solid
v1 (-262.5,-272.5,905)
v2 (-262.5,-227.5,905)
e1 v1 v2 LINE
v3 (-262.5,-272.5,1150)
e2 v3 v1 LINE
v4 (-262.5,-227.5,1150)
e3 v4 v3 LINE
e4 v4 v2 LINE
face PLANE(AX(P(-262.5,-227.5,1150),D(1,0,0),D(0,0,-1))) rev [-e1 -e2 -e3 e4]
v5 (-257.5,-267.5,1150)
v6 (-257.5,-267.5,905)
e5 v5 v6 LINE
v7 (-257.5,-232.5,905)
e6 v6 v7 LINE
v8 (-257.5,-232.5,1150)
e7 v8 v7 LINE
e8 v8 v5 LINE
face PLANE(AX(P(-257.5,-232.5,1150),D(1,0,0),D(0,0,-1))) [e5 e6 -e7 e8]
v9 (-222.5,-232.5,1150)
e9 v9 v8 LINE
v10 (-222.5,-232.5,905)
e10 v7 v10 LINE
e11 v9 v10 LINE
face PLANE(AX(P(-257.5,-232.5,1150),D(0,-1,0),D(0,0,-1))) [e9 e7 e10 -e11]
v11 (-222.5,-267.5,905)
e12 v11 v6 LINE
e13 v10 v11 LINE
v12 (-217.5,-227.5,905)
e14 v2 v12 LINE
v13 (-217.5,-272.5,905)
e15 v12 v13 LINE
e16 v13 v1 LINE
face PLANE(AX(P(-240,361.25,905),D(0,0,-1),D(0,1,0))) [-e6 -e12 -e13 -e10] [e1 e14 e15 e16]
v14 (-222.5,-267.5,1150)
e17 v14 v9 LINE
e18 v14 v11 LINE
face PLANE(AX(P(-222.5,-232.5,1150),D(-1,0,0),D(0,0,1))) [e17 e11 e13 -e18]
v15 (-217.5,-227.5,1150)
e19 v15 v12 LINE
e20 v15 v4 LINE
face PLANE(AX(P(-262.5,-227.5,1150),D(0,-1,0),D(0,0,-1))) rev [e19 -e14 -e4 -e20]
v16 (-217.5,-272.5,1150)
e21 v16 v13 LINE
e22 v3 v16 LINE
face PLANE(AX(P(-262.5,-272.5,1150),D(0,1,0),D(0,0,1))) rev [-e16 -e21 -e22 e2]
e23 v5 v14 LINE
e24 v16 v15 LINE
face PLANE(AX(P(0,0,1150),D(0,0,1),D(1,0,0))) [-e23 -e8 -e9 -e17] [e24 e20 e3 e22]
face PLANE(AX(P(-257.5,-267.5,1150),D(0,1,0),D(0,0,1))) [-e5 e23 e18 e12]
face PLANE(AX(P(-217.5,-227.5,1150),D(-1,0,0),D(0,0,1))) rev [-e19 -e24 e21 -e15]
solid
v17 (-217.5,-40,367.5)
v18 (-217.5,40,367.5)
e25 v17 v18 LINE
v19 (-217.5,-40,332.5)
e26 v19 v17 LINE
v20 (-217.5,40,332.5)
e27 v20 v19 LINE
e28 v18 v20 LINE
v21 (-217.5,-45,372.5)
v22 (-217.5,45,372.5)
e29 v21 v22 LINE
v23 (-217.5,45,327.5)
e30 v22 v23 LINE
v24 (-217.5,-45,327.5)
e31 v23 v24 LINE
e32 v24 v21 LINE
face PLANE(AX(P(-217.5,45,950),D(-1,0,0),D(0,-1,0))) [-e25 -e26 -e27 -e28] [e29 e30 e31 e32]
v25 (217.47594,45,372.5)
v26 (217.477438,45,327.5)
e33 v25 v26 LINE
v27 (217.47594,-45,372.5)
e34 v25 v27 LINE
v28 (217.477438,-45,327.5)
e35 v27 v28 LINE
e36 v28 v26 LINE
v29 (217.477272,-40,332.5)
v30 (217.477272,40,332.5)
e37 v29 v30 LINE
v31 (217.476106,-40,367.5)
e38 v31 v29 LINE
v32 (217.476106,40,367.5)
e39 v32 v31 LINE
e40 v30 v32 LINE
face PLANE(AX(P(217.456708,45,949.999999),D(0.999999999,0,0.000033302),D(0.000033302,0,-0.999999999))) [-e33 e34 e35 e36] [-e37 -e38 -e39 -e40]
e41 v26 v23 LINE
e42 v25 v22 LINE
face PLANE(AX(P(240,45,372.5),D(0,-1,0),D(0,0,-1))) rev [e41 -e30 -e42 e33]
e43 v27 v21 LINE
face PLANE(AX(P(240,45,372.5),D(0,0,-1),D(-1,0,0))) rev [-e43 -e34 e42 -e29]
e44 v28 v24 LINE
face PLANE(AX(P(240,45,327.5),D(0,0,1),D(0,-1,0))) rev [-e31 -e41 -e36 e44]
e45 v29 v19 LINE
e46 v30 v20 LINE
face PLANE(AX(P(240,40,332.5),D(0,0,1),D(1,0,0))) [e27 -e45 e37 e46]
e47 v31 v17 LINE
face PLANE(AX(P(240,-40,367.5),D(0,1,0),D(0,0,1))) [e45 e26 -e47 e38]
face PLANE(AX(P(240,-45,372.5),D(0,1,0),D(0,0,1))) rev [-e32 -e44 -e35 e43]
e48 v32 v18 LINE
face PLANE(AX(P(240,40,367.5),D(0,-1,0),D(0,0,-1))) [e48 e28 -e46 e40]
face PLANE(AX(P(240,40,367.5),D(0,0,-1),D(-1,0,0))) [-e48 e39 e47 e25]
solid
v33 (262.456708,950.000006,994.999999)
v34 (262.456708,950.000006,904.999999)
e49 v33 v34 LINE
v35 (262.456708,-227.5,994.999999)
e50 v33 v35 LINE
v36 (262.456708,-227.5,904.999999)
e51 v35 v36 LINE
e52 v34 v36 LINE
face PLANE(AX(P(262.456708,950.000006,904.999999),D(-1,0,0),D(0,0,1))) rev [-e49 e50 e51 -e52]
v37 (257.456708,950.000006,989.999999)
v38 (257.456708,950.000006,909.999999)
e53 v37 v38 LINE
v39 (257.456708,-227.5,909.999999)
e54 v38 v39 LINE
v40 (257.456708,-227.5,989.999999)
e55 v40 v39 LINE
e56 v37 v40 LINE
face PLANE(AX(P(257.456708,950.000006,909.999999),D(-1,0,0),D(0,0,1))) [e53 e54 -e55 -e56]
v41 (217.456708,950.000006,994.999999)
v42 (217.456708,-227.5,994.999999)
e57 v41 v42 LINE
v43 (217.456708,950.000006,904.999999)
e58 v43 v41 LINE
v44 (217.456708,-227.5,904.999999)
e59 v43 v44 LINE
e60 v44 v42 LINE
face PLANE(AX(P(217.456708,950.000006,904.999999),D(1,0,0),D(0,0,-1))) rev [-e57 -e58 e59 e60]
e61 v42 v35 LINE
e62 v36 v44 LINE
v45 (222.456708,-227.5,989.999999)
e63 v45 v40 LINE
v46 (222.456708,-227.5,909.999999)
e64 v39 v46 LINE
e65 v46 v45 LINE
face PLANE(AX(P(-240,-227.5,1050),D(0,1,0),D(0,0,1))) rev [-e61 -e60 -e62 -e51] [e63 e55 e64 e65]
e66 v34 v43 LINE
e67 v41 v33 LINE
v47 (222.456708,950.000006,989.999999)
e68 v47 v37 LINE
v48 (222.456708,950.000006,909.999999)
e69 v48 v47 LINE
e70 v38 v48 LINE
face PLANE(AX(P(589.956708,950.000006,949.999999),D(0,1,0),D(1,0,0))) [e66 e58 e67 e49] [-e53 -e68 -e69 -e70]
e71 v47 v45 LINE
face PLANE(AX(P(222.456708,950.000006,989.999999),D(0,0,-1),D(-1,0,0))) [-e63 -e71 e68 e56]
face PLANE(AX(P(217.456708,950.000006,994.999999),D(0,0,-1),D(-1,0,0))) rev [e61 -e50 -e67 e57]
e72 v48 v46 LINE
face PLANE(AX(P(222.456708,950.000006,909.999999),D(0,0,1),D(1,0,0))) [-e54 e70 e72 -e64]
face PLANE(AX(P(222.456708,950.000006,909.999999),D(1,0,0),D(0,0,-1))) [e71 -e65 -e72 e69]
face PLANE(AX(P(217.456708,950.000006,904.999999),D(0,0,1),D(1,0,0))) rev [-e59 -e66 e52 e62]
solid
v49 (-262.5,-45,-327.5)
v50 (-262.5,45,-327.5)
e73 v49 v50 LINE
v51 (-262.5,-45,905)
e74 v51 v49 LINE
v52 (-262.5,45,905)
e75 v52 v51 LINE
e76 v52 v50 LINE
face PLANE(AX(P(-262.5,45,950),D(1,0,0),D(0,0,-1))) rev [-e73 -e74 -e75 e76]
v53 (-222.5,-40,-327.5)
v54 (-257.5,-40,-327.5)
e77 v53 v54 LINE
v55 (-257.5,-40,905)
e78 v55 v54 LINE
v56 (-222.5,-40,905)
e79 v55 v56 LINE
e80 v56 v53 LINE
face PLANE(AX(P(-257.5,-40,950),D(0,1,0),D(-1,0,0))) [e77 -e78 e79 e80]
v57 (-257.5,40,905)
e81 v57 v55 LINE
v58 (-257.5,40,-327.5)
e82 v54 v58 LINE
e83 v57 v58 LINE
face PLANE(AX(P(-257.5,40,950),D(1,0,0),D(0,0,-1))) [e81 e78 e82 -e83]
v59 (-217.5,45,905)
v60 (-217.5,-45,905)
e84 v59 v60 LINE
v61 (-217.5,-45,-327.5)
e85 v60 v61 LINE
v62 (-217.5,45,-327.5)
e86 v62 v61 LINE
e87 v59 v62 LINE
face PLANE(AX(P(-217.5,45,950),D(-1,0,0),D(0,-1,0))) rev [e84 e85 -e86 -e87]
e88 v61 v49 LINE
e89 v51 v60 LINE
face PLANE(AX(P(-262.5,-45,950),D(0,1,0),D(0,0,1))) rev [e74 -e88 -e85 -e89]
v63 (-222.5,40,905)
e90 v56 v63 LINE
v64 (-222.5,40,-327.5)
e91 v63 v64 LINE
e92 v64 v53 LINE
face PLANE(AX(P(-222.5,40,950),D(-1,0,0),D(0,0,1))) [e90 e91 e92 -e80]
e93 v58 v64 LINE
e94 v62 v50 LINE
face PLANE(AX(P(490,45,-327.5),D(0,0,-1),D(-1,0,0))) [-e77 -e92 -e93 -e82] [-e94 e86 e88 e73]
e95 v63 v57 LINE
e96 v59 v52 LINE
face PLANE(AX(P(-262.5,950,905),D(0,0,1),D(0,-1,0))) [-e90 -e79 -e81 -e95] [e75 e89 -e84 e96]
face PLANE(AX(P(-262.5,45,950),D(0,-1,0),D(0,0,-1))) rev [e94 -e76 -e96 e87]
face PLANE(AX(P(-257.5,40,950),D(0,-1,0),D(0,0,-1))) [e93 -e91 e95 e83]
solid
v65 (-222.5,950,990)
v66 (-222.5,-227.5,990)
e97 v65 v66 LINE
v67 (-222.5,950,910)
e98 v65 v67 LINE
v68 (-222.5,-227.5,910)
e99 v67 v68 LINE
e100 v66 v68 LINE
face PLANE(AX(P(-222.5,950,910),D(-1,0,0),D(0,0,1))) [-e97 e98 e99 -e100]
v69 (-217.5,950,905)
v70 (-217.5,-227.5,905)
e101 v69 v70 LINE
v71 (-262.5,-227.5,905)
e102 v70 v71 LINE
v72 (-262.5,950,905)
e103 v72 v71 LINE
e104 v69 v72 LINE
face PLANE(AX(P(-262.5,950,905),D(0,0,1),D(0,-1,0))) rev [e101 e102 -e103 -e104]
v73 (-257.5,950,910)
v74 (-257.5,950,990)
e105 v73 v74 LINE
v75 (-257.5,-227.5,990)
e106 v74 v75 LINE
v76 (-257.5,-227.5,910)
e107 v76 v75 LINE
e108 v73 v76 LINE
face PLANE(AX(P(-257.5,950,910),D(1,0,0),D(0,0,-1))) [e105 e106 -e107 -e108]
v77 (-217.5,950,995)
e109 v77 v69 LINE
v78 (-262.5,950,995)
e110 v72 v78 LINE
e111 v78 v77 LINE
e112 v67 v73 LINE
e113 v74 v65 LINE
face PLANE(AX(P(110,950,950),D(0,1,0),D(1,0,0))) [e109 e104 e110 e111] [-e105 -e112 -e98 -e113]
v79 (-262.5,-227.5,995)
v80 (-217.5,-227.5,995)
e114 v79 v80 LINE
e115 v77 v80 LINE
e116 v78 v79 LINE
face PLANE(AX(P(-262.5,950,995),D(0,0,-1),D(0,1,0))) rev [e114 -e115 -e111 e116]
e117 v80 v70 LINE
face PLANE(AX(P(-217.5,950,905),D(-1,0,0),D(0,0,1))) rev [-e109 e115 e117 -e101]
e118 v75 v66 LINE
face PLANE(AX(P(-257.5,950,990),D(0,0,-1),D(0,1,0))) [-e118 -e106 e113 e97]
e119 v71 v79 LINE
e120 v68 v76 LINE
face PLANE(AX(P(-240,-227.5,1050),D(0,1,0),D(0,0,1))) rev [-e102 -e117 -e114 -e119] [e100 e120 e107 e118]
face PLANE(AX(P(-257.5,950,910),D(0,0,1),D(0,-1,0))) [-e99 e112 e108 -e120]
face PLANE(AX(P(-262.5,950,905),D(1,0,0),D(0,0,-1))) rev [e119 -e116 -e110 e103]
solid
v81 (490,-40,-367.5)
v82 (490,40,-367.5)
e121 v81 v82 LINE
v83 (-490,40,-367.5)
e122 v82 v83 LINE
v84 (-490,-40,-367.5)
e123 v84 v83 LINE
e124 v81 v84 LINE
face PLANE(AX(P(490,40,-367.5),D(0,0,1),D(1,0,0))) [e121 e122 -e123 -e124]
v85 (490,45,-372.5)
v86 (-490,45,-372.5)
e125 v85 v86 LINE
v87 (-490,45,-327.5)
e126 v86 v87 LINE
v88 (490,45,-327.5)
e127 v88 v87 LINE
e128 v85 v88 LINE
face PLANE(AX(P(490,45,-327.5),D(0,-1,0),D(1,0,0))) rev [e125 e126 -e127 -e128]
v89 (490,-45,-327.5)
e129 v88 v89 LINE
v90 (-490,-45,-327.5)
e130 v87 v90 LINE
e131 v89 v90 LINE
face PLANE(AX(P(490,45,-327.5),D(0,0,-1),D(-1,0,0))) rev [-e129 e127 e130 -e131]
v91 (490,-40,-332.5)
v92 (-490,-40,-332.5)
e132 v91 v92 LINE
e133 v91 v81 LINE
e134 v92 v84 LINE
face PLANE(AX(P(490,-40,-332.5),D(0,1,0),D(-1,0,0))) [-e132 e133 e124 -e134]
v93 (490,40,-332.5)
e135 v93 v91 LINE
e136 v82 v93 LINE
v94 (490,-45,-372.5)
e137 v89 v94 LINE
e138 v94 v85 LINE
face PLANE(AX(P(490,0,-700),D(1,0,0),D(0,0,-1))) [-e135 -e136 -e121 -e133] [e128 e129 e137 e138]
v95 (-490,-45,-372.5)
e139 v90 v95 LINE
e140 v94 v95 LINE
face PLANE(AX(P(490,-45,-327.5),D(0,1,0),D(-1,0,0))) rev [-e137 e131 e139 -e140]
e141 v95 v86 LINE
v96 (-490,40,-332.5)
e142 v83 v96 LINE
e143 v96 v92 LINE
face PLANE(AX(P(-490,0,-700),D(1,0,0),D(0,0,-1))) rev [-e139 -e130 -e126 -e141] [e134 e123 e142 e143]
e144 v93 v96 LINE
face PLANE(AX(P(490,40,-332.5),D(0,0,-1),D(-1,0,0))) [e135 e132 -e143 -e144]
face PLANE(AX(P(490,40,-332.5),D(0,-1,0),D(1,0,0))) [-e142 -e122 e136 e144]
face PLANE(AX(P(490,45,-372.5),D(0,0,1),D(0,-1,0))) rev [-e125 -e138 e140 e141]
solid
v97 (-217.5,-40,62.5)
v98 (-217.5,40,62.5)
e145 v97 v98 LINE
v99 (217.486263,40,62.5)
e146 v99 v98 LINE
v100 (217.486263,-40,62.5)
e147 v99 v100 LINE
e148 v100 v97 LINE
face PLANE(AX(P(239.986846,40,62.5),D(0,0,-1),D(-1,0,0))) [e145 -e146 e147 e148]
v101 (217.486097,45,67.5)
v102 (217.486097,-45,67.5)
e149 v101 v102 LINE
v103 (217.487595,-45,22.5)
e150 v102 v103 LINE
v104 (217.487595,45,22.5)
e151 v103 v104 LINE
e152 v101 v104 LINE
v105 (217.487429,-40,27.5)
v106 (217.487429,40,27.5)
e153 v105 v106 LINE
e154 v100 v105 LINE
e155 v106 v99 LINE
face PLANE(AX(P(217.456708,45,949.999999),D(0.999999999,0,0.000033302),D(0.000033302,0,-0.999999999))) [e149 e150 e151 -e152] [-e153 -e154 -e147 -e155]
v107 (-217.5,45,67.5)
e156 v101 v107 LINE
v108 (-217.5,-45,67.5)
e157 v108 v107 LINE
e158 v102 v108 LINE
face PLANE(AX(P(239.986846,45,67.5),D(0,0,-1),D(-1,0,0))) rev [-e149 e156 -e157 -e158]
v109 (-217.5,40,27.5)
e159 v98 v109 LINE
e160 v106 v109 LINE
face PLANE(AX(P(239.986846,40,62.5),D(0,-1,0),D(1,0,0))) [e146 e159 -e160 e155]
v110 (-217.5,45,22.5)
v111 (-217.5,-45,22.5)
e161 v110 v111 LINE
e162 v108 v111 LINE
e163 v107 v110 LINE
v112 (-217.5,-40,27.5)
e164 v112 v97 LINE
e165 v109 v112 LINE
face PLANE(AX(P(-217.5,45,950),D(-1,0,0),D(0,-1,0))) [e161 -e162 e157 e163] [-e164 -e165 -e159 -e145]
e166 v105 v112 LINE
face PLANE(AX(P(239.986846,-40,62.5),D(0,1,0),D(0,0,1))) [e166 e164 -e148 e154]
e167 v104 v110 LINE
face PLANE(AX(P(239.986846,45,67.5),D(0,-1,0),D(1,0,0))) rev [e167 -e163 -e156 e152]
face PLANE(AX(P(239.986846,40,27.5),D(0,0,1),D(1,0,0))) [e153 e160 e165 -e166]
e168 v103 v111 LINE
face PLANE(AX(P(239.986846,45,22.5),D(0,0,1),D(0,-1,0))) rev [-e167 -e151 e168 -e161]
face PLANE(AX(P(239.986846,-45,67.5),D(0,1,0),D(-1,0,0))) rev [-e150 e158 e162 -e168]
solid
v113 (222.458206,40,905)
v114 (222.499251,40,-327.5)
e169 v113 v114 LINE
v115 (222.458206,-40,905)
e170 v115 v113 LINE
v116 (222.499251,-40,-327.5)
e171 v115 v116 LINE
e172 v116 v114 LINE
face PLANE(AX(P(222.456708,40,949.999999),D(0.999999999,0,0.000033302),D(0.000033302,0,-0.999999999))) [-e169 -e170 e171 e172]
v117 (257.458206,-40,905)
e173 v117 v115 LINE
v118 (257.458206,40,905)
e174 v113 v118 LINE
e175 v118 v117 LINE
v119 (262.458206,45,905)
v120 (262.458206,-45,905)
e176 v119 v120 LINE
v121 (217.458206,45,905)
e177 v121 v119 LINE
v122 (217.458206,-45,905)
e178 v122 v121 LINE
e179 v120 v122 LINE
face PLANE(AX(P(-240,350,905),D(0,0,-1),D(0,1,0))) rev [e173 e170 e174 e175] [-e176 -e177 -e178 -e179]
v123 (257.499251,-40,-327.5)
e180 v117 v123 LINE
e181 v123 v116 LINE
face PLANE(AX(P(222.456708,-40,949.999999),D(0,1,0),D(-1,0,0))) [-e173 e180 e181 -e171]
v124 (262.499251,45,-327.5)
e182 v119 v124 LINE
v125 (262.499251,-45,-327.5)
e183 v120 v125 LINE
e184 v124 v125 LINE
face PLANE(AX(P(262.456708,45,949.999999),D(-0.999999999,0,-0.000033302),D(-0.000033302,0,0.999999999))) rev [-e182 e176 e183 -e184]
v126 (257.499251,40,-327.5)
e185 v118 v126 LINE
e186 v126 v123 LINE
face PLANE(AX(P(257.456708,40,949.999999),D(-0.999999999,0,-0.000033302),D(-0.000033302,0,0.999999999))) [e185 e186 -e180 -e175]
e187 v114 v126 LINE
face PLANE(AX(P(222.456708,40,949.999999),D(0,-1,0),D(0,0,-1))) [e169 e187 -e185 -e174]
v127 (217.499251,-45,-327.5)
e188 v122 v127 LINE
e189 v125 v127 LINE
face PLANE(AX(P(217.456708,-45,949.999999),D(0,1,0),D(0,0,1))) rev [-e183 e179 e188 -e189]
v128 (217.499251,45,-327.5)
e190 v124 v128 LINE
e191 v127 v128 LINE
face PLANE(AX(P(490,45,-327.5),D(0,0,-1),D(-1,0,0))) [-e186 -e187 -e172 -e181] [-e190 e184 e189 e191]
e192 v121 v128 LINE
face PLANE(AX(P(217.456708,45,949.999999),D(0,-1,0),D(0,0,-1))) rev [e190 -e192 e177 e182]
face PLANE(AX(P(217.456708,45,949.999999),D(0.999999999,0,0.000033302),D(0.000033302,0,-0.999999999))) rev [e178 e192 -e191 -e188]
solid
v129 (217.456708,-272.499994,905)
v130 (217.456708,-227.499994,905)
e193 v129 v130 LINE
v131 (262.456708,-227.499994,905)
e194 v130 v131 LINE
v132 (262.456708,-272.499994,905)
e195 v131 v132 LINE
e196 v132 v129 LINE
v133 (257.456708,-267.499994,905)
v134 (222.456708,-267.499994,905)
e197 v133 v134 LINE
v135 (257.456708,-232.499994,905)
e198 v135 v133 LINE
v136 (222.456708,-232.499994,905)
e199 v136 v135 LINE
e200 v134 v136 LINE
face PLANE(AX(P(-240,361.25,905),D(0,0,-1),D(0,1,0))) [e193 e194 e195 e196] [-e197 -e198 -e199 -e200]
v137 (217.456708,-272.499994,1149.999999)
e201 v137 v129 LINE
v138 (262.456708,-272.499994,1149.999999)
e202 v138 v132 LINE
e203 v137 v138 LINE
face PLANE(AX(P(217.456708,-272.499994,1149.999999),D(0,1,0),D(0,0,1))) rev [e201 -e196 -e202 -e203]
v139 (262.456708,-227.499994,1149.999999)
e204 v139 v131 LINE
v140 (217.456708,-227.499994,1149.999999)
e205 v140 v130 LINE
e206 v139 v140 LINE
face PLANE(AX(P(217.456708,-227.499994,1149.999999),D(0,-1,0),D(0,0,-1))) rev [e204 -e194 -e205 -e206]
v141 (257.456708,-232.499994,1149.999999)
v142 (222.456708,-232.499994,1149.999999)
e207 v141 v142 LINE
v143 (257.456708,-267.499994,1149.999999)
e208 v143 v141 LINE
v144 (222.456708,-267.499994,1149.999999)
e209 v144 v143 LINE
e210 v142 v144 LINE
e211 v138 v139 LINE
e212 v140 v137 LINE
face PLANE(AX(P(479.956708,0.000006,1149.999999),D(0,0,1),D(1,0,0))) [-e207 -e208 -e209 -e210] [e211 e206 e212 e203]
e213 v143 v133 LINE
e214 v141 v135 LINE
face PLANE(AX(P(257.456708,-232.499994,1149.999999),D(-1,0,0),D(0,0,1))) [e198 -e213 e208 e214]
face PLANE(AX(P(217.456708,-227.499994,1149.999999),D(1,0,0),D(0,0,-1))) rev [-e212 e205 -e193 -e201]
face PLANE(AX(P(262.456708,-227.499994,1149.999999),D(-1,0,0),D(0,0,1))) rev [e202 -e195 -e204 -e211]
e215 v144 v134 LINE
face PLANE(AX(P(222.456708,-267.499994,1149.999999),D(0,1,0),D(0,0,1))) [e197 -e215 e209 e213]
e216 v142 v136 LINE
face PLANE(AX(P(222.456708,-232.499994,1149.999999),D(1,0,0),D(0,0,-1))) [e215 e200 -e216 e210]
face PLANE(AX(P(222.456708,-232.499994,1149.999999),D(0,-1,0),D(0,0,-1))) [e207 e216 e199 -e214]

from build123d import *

# Parameters (mm, degrees)
SIGPROFILE_START                    = -45
SIGPROFILE_SIGMA9045_1_DEPTH        = 90
SIGPROFILE_SIGMA9045_1_2_DEPTH      = 5
SIGPROFILE_START_2                  = 40
SIGPROFILE_SIGMA9045_1_3_DEPTH      = 5
SIGPROFILE_SIGMA9045_1_4_DEPTH      = 90
SIGPROFILE_SIGMA9045_1_5_DEPTH      = 5
SIGPROFILE_SIGMA9045_1_6_DEPTH      = 5
SIGPROFILE_SIGMA9045_1_7_OUTLINE_W  = 5
SIGPROFILE_SIGMA9045_1_7_OUTLINE_H  = 1232.5
SIGPROFILE_SIGMA9045_1_7_DEPTH      = 90
SIGPROFILE_SIGMA9045_1_8_OUTLINE_W  = 35
SIGPROFILE_SIGMA9045_1_8_OUTLINE_H  = 1232.5
SIGPROFILE_SIGMA9045_1_8_DEPTH      = 5
SIGPROFILE_SIGMA9045_1_9_OUTLINE_W  = 35
SIGPROFILE_SIGMA9045_1_9_OUTLINE_H  = 1232.5
SIGPROFILE_SIGMA9045_1_9_DEPTH      = 5
SIGPROFILE_START_3                  = -372.5
SIGPROFILE_SIGMA9045_1_10_OUTLINE_W = 980
SIGPROFILE_SIGMA9045_1_10_OUTLINE_H = 90
SIGPROFILE_SIGMA9045_1_10_DEPTH     = 5
SIGPROFILE_START_4                  = -332.5
SIGPROFILE_SIGMA9045_1_11_OUTLINE_W = 980
SIGPROFILE_SIGMA9045_1_11_OUTLINE_H = 90
SIGPROFILE_SIGMA9045_1_11_DEPTH     = 5
SIGPROFILE_START_5                  = -367.5
SIGPROFILE_SIGMA9045_1_12_OUTLINE_W = 980
SIGPROFILE_SIGMA9045_1_12_OUTLINE_H = 5
SIGPROFILE_SIGMA9045_1_12_DEPTH     = 35
SIGPROFILE_START_6                  = 217.45670792
SIGPROFILE_SIGMA9045_1_13_OUTLINE_W = 1200
SIGPROFILE_SIGMA9045_1_13_OUTLINE_H = 90
SIGPROFILE_SIGMA9045_1_13_DEPTH     = 5
SIGPROFILE_START_7                  = 257.45670792
SIGPROFILE_SIGMA9045_1_14_OUTLINE_W = 1200
SIGPROFILE_SIGMA9045_1_14_OUTLINE_H = 90
SIGPROFILE_SIGMA9045_1_14_DEPTH     = 5
SIGPROFILE_START_8                  = 222.45670792
SIGPROFILE_SIGMA9045_1_15_OUTLINE_W = 1200
SIGPROFILE_SIGMA9045_1_15_OUTLINE_H = 5
SIGPROFILE_SIGMA9045_1_15_DEPTH     = 35
SIGPROFILE_START_9                  = -262.5
SIGPROFILE_SIGMA9045_1_16_OUTLINE_W = 1200
SIGPROFILE_SIGMA9045_1_16_OUTLINE_H = 90
SIGPROFILE_SIGMA9045_1_16_DEPTH     = 5
SIGPROFILE_START_10                 = -222.5
SIGPROFILE_SIGMA9045_1_17_OUTLINE_W = 1200
SIGPROFILE_SIGMA9045_1_17_OUTLINE_H = 90
SIGPROFILE_SIGMA9045_1_17_DEPTH     = 5
SIGPROFILE_START_11                 = -257.5
SIGPROFILE_SIGMA9045_1_18_OUTLINE_W = 1200
SIGPROFILE_SIGMA9045_1_18_OUTLINE_H = 5
SIGPROFILE_SIGMA9045_1_18_DEPTH     = 35
SIGPROFILE_SIGMA9045_1_19_DEPTH     = 90
SIGPROFILE_SIGMA9045_1_20_DEPTH     = 5
SIGPROFILE_SIGMA9045_1_21_DEPTH     = 5
SKETCH11_W                          = 45
SKETCH11_H                          = 45
SKETCH11_W_2                        = 35
SKETCH11_H_2                        = 35
SIGPROFILE_SIGMA4545LIGHT_1_DEPTH   = 200
SKETCH11_ON_SEGMENT_2_W             = 45
SKETCH11_ON_SEGMENT_2_H             = 45
SKETCH11_ON_SEGMENT_2_W_2           = 35
SKETCH11_ON_SEGMENT_2_H_2           = 35
SIGPROFILE_SIGMA4545LIGHT_1_2_DEPTH = 200
BODY_8_RUN_ON_DEPTH                 = 45
BODY_9_RUN_ON_DEPTH                 = 44.999999


# Read off the part's stored shape, not the designer's step: Sigprofile SIGMA9045(1)
with BuildPart() as part:
    # Sigprofile SIGMA9045(1) outline → Sigprofile SIGMA9045(1) (new body)
    with BuildSketch(Plane(origin=(0, 0, 0), x_dir=(1, 0, 0), z_dir=(0, 1, 0)).offset(SIGPROFILE_START)):
        Polygon((217.477438166, -327.5), (-217.5, -327.5), (-217.5, -332.5), (217.477271658, -332.5), align=None)
        Polygon((217.476106102, -367.5), (-217.5, -367.5), (-217.5, -372.5), (217.475939594, -372.5), align=None)
    extrude(amount=SIGPROFILE_SIGMA9045_1_DEPTH)

    # Sigprofile SIGMA9045_1 2 outline → Sigprofile SIGMA9045_1 2 (add)
    with BuildSketch(Plane(origin=(0, 0, 0), x_dir=(1, 0, 0), z_dir=(0, 1, 0)).offset(SIGPROFILE_START)):
        Polygon((217.477271658, -332.5), (-217.5, -332.5), (-217.5, -367.5), (217.476106102, -367.5), align=None)
    extrude(amount=SIGPROFILE_SIGMA9045_1_2_DEPTH)

    # Sigprofile SIGMA9045_1 3 outline → Sigprofile SIGMA9045_1 3 (add)
    with BuildSketch(Plane(origin=(0, 0, 0), x_dir=(1, 0, 0), z_dir=(0, 1, 0)).offset(SIGPROFILE_START_2)):
        Polygon((217.477271658, -332.5), (-217.5, -332.5), (-217.5, -367.5), (217.476106102, -367.5), align=None)
    extrude(amount=SIGPROFILE_SIGMA9045_1_3_DEPTH)


with BuildPart() as body_2:
    # Sigprofile SIGMA9045_1 4 outline → Sigprofile SIGMA9045_1 4 (new body)
    with BuildSketch(Plane(origin=(0, 0, 0), x_dir=(1, 0, 0), z_dir=(0, 1, 0)).offset(SIGPROFILE_START)):
        Polygon((217.486096582, -67.5), (217.48626309, -62.5), (-217.5, -62.5), (-217.5, -67.5), align=None)
        Polygon((-217.5, -27.5), (217.487428646, -27.5), (217.487595154, -22.5), (-217.5, -22.5), align=None)
    extrude(amount=SIGPROFILE_SIGMA9045_1_4_DEPTH)

    # Sigprofile SIGMA9045_1 5 outline → Sigprofile SIGMA9045_1 5 (add)
    with BuildSketch(Plane(origin=(0, 0, 0), x_dir=(1, 0, 0), z_dir=(0, 1, 0)).offset(SIGPROFILE_START)):
        Polygon((-217.5, -62.5), (217.48626309, -62.5), (217.487428646, -27.5), (-217.5, -27.5), align=None)
    extrude(amount=SIGPROFILE_SIGMA9045_1_5_DEPTH)

    # Sigprofile SIGMA9045_1 6 outline → Sigprofile SIGMA9045_1 6 (add)
    with BuildSketch(Plane(origin=(0, 0, 0), x_dir=(1, 0, 0), z_dir=(0, 1, 0)).offset(SIGPROFILE_START_2)):
        Polygon((-217.5, -62.5), (217.48626309, -62.5), (217.487428646, -27.5), (-217.5, -27.5), align=None)
    extrude(amount=SIGPROFILE_SIGMA9045_1_6_DEPTH)


with BuildPart() as body_3:
    # Sigprofile SIGMA9045_1 7 outline → Sigprofile SIGMA9045_1 7 (new body)
    with BuildSketch(Plane(origin=(0, 0, 0), x_dir=(1, 0, 0), z_dir=(0, 1, 0)).offset(SIGPROFILE_START)):
        with Locations((-220, -288.75)):
            Rectangle(SIGPROFILE_SIGMA9045_1_7_OUTLINE_W, SIGPROFILE_SIGMA9045_1_7_OUTLINE_H)
        with Locations((-260, -288.75)):
            Rectangle(SIGPROFILE_SIGMA9045_1_7_OUTLINE_W, SIGPROFILE_SIGMA9045_1_7_OUTLINE_H)
    extrude(amount=SIGPROFILE_SIGMA9045_1_7_DEPTH)

    # Sigprofile SIGMA9045_1 8 outline → Sigprofile SIGMA9045_1 8 (add)
    with BuildSketch(Plane(origin=(0, 0, 0), x_dir=(1, 0, 0), z_dir=(0, 1, 0)).offset(SIGPROFILE_START)):
        with Locations((-240, -288.75)):
            Rectangle(SIGPROFILE_SIGMA9045_1_8_OUTLINE_W, SIGPROFILE_SIGMA9045_1_8_OUTLINE_H)
    extrude(amount=SIGPROFILE_SIGMA9045_1_8_DEPTH)

    # Sigprofile SIGMA9045_1 9 outline → Sigprofile SIGMA9045_1 9 (add)
    with BuildSketch(Plane(origin=(0, 0, 0), x_dir=(1, 0, 0), z_dir=(0, 1, 0)).offset(SIGPROFILE_START_2)):
        with Locations((-240, -288.75)):
            Rectangle(SIGPROFILE_SIGMA9045_1_9_OUTLINE_W, SIGPROFILE_SIGMA9045_1_9_OUTLINE_H)
    extrude(amount=SIGPROFILE_SIGMA9045_1_9_DEPTH)


with BuildPart() as body_4:
    # Sigprofile SIGMA9045_1 10 outline → Sigprofile SIGMA9045_1 10 (new body)
    with BuildSketch(Plane.XY.offset(SIGPROFILE_START_3)):
        Rectangle(SIGPROFILE_SIGMA9045_1_10_OUTLINE_W, SIGPROFILE_SIGMA9045_1_10_OUTLINE_H)
    extrude(amount=SIGPROFILE_SIGMA9045_1_10_DEPTH)

    # Sigprofile SIGMA9045_1 11 outline → Sigprofile SIGMA9045_1 11 (add)
    with BuildSketch(Plane.XY.offset(SIGPROFILE_START_4)):
        Rectangle(SIGPROFILE_SIGMA9045_1_11_OUTLINE_W, SIGPROFILE_SIGMA9045_1_11_OUTLINE_H)
    extrude(amount=SIGPROFILE_SIGMA9045_1_11_DEPTH)

    # Sigprofile SIGMA9045_1 12 outline → Sigprofile SIGMA9045_1 12 (add)
    with BuildSketch(Plane.XY.offset(SIGPROFILE_START_5)):
        with Locations((0, 42.5)):
            Rectangle(SIGPROFILE_SIGMA9045_1_12_OUTLINE_W, SIGPROFILE_SIGMA9045_1_12_OUTLINE_H)
        with Locations((0, -42.5)):
            Rectangle(SIGPROFILE_SIGMA9045_1_12_OUTLINE_W, SIGPROFILE_SIGMA9045_1_12_OUTLINE_H)
    extrude(amount=SIGPROFILE_SIGMA9045_1_12_DEPTH)


with BuildPart() as body_5:
    # Sigprofile SIGMA9045_1 13 outline → Sigprofile SIGMA9045_1 13 (new body)
    with BuildSketch(Plane.YZ.offset(SIGPROFILE_START_6)):
        with Locations((350.000005857, 949.999999279)):
            Rectangle(SIGPROFILE_SIGMA9045_1_13_OUTLINE_W, SIGPROFILE_SIGMA9045_1_13_OUTLINE_H)
    extrude(amount=SIGPROFILE_SIGMA9045_1_13_DEPTH)

    # Sigprofile SIGMA9045_1 14 outline → Sigprofile SIGMA9045_1 14 (add)
    with BuildSketch(Plane.YZ.offset(SIGPROFILE_START_7)):
        with Locations((350.000005857, 949.999999279)):
            Rectangle(SIGPROFILE_SIGMA9045_1_14_OUTLINE_W, SIGPROFILE_SIGMA9045_1_14_OUTLINE_H)
    extrude(amount=SIGPROFILE_SIGMA9045_1_14_DEPTH)

    # Sigprofile SIGMA9045_1 15 outline → Sigprofile SIGMA9045_1 15 (add)
    with BuildSketch(Plane.YZ.offset(SIGPROFILE_START_8)):
        with Locations((350.000005857, 907.499999279)):
            Rectangle(SIGPROFILE_SIGMA9045_1_15_OUTLINE_W, SIGPROFILE_SIGMA9045_1_15_OUTLINE_H)
        with Locations((350.000005857, 992.499999279)):
            Rectangle(SIGPROFILE_SIGMA9045_1_15_OUTLINE_W, SIGPROFILE_SIGMA9045_1_15_OUTLINE_H)
    extrude(amount=SIGPROFILE_SIGMA9045_1_15_DEPTH)

    # Trim/Extend3
    split(bisect_by=Plane(origin=(-240, -227.5, 1050), x_dir=(-1, 0, 0), z_dir=(0, 1, 0)), keep=Keep.TOP)


with BuildPart() as body_6:
    # Sigprofile SIGMA9045_1 16 outline → Sigprofile SIGMA9045_1 16 (new body)
    with BuildSketch(Plane.YZ.offset(SIGPROFILE_START_9)):
        with Locations((350, 950)):
            Rectangle(SIGPROFILE_SIGMA9045_1_16_OUTLINE_W, SIGPROFILE_SIGMA9045_1_16_OUTLINE_H)
    extrude(amount=SIGPROFILE_SIGMA9045_1_16_DEPTH)

    # Sigprofile SIGMA9045_1 17 outline → Sigprofile SIGMA9045_1 17 (add)
    with BuildSketch(Plane.YZ.offset(SIGPROFILE_START_10)):
        with Locations((350, 950)):
            Rectangle(SIGPROFILE_SIGMA9045_1_17_OUTLINE_W, SIGPROFILE_SIGMA9045_1_17_OUTLINE_H)
    extrude(amount=SIGPROFILE_SIGMA9045_1_17_DEPTH)

    # Sigprofile SIGMA9045_1 18 outline → Sigprofile SIGMA9045_1 18 (add)
    with BuildSketch(Plane.YZ.offset(SIGPROFILE_START_11)):
        with Locations((350, 907.5)):
            Rectangle(SIGPROFILE_SIGMA9045_1_18_OUTLINE_W, SIGPROFILE_SIGMA9045_1_18_OUTLINE_H)
        with Locations((350, 992.5)):
            Rectangle(SIGPROFILE_SIGMA9045_1_18_OUTLINE_W, SIGPROFILE_SIGMA9045_1_18_OUTLINE_H)
    extrude(amount=SIGPROFILE_SIGMA9045_1_18_DEPTH)

    # Trim/Extend3
    split(bisect_by=Plane(origin=(-240, -227.5, 1050), x_dir=(-1, 0, 0), z_dir=(0, 1, 0)), keep=Keep.TOP)


with BuildPart() as body_7:
    # Sigprofile SIGMA9045_1 19 outline → Sigprofile SIGMA9045_1 19 (new body)
    with BuildSketch(Plane(origin=(0, 0, 0), x_dir=(1, 0, 0), z_dir=(0, 1, 0)).offset(SIGPROFILE_START)):
        Polygon((217.455209348, -994.999999279), (222.455209348, -994.999999279), (222.499250714, 327.5), (217.499250714, 327.5), align=None)
        Polygon((257.499250714, 327.5), (257.455209348, -994.999999279), (262.455209348, -994.999999279), (262.499250714, 327.5), align=None)
    extrude(amount=SIGPROFILE_SIGMA9045_1_19_DEPTH)

    # Sigprofile SIGMA9045_1 20 outline → Sigprofile SIGMA9045_1 20 (add)
    with BuildSketch(Plane(origin=(0, 0, 0), x_dir=(1, 0, 0), z_dir=(0, 1, 0)).offset(SIGPROFILE_START)):
        Polygon((222.499250714, 327.5), (222.455209348, -994.999999279), (257.455209348, -994.999999279), (257.499250714, 327.5), align=None)
    extrude(amount=SIGPROFILE_SIGMA9045_1_20_DEPTH)

    # Sigprofile SIGMA9045_1 21 outline → Sigprofile SIGMA9045_1 21 (add)
    with BuildSketch(Plane(origin=(0, 0, 0), x_dir=(1, 0, 0), z_dir=(0, 1, 0)).offset(SIGPROFILE_START_2)):
        Polygon((222.499250714, 327.5), (222.455209348, -994.999999279), (257.455209348, -994.999999279), (257.499250714, 327.5), align=None)
    extrude(amount=SIGPROFILE_SIGMA9045_1_21_DEPTH)

    # Trim/Extend2
    split(bisect_by=Plane(origin=(-240, 350, 905), x_dir=(0, 1, 0), z_dir=(0, 0, -1)), keep=Keep.TOP)


with BuildPart() as body_8:
    # Sketch11 → Sigprofile SIGMA4545LIGHT(1) (new body)
    with BuildSketch(Plane(origin=(-240, -250, 950), x_dir=(1, 0, 0), z_dir=(0, 0, 1))):
        Rectangle(SKETCH11_W, SKETCH11_H)
        Rectangle(SKETCH11_W_2, SKETCH11_H_2, mode=Mode.SUBTRACT)
    extrude(amount=SIGPROFILE_SIGMA4545LIGHT_1_DEPTH)

    # Sketch11 → body 8 run on (add)
    with BuildSketch(Plane(origin=(-240, -250, 950), x_dir=(1, 0, 0), z_dir=(0, 0, 1))):
        Rectangle(SKETCH11_W, SKETCH11_H)
        Rectangle(SKETCH11_W_2, SKETCH11_H_2, mode=Mode.SUBTRACT)
    extrude(amount=-BODY_8_RUN_ON_DEPTH)


with BuildPart() as body_9:
    # Sketch11 on segment 2 (carried to segment 2) → Sigprofile SIGMA4545LIGHT_1 2 (new body)
    with BuildSketch(Plane(origin=(239.95670792, -249.999994143, 949.999999279), x_dir=(1, 0, 0), z_dir=(0, 0, 1))):
        Rectangle(SKETCH11_ON_SEGMENT_2_W, SKETCH11_ON_SEGMENT_2_H)
        Rectangle(SKETCH11_ON_SEGMENT_2_W_2, SKETCH11_ON_SEGMENT_2_H_2, mode=Mode.SUBTRACT)
    extrude(amount=SIGPROFILE_SIGMA4545LIGHT_1_2_DEPTH)

    # Sketch11 on segment 2 (carried to segment 2) → body 9 run on (add)
    with BuildSketch(Plane(origin=(239.95670792, -249.999994143, 949.999999279), x_dir=(1, 0, 0), z_dir=(0, 0, 1))):
        Rectangle(SKETCH11_ON_SEGMENT_2_W, SKETCH11_ON_SEGMENT_2_H)
        Rectangle(SKETCH11_ON_SEGMENT_2_W_2, SKETCH11_ON_SEGMENT_2_H_2, mode=Mode.SUBTRACT)
    extrude(amount=-BODY_9_RUN_ON_DEPTH)


solid = Compound([part.part, body_2.part, body_3.part, body_4.part, body_5.part, body_6.part, body_7.part, body_8.part, body_9.part])
